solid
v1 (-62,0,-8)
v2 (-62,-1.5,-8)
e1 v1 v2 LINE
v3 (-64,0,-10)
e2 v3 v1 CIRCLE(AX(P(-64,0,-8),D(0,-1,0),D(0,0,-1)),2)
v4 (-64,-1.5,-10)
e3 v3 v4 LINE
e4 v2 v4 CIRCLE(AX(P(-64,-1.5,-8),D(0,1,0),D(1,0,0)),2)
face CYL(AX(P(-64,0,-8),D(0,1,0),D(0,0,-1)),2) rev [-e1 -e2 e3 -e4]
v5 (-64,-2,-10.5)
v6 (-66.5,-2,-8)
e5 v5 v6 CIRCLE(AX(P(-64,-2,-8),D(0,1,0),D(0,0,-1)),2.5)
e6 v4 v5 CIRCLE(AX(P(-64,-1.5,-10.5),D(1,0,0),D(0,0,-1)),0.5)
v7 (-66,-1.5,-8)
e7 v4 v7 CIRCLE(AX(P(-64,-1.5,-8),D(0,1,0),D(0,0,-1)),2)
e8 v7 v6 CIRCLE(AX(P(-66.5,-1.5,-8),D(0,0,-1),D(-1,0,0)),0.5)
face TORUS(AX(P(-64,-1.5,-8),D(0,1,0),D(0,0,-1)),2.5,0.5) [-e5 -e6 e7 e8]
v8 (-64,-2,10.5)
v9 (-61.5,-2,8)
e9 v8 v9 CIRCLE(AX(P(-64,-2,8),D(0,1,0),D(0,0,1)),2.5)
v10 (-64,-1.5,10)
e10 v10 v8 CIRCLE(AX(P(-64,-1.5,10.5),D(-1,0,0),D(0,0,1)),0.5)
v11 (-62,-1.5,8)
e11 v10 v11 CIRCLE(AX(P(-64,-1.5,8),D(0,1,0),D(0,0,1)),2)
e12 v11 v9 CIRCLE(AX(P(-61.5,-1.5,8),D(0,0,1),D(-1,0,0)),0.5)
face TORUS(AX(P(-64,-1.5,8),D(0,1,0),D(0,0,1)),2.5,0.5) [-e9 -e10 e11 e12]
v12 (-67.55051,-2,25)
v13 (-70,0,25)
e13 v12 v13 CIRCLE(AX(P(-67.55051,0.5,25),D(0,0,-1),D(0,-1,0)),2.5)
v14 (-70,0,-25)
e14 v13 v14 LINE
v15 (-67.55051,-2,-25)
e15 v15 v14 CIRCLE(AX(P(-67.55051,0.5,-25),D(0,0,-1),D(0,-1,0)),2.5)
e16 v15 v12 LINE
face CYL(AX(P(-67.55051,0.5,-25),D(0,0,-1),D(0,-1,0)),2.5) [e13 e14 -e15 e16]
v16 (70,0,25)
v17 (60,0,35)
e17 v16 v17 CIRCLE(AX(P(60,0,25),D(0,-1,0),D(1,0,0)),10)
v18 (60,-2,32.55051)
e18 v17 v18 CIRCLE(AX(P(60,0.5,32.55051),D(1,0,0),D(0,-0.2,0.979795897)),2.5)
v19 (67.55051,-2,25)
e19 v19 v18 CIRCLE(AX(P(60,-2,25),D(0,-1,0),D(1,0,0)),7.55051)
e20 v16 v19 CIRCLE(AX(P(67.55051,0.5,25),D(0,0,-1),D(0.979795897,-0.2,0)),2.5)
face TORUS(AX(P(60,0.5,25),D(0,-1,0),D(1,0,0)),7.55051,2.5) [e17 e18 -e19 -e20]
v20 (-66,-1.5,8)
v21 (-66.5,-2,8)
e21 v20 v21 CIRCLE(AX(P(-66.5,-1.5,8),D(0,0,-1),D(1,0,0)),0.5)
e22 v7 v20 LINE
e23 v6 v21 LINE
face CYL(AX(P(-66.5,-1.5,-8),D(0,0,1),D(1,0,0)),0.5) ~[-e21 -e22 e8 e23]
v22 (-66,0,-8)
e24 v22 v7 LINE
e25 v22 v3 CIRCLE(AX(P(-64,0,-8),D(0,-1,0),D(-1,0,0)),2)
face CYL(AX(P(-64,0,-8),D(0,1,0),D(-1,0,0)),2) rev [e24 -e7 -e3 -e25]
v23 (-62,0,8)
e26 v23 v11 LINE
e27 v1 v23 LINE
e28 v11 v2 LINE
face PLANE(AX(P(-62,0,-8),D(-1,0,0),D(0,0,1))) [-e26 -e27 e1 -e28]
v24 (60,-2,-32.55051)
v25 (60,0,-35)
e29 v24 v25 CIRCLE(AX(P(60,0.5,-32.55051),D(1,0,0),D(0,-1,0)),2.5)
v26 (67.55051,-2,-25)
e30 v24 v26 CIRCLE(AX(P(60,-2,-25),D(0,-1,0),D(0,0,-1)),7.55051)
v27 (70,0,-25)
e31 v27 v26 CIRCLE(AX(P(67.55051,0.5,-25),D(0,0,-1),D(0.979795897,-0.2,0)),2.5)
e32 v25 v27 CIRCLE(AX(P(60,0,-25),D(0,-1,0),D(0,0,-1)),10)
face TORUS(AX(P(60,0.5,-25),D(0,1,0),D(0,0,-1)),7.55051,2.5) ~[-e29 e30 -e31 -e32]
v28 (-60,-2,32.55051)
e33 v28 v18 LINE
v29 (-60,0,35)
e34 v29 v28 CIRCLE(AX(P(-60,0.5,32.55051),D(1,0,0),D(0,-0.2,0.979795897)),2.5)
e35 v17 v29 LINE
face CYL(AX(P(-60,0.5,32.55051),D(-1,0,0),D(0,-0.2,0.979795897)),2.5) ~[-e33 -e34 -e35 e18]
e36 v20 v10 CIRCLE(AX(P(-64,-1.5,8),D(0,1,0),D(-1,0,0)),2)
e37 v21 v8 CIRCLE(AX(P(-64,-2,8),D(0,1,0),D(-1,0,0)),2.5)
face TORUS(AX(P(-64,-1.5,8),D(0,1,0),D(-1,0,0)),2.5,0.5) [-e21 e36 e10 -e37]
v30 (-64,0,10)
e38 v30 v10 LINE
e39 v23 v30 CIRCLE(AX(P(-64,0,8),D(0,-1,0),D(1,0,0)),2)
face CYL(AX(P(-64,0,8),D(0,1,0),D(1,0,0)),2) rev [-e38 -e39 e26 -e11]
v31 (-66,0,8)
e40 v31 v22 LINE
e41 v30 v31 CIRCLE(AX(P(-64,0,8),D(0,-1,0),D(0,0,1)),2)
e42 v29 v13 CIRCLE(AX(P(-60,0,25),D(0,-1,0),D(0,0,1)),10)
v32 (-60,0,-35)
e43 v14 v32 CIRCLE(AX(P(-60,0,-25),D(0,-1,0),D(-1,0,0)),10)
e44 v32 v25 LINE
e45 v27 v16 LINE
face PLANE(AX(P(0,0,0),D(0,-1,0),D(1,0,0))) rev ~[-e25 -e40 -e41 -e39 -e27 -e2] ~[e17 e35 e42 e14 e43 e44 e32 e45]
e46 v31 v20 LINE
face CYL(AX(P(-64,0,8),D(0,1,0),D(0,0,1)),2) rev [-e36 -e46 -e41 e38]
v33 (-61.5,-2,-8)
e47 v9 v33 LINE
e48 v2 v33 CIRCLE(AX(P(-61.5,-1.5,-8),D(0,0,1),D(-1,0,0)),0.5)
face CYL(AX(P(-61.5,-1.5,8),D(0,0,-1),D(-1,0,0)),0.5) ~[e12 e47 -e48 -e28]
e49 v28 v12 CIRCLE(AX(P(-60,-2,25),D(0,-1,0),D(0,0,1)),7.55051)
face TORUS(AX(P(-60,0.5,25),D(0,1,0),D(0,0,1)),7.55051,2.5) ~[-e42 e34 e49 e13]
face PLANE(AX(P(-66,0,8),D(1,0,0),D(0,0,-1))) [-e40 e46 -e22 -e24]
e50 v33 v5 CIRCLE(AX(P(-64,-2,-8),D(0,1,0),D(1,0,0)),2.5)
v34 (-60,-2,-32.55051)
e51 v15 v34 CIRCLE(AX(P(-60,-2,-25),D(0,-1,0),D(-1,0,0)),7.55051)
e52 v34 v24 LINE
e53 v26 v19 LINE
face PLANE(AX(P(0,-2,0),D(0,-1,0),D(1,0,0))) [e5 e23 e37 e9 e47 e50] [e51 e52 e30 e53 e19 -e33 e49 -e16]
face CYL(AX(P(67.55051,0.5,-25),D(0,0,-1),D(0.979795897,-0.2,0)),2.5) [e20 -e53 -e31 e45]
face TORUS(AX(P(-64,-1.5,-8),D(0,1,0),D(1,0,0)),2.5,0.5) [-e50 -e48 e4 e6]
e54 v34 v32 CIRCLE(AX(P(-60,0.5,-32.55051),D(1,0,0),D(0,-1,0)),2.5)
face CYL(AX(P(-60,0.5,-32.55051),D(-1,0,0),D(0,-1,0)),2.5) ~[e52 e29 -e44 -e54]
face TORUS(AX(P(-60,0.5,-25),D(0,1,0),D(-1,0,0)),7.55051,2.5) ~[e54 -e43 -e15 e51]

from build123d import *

# Parameters (mm, degrees)
F1_DEPTH     = 2
F3_DEPTH     = 25
F4_T1_DEPTH  = 50
F4_T3_DEPTH  = 120
F4_T6_ANGLE  = 90
F4_T8_ANGLE  = 90
F4_T10_ANGLE = 90
F4_T12_ANGLE = 90
F5_R         = 0.5


# Not quite as in the source:
# - a fillet or chamfer that OpenCascade refuses, or shapes differently, is made with other operations: its cross-section is extruded or revolved along the edge and cut away or added


with BuildPart() as f1:
    # F0 (on Front) → F1 (new body)
    with BuildSketch(Plane.XZ):
        with BuildLine():
            ThreePointArc((70, 25), (67.0710678119, 32.0710678119), (60, 35))
            Line((60, 35), (-60, 35))
            ThreePointArc((-60, 35), (-67.0710678119, 32.0710678119), (-70, 25))
            Line((-70, 25), (-70, -25))
            ThreePointArc((-70, -25), (-67.0710678119, -32.0710678119), (-60, -35))
            Line((-60, -35), (60, -35))
            ThreePointArc((60, -35), (67.0710678119, -32.0710678119), (70, -25))
            Line((70, -25), (70, 25))
        make_face()
    extrude(amount=F1_DEPTH)

    # F2 (on Front) → F3 (cut)
    with BuildSketch(Plane.XZ):
        with BuildLine():
            Line((-62, -8), (-62, 8))
            ThreePointArc((-62, 8), (-62.5857864376, 9.4142135624), (-64, 10))
            ThreePointArc((-64, 10), (-65.4142135624, 9.4142135624), (-66, 8))
            Line((-66, 8), (-66, -8))
            ThreePointArc((-66, -8), (-65.4142135624, -9.4142135624), (-64, -10))
            ThreePointArc((-64, -10), (-62.5857864376, -9.4142135624), (-62, -8))
        make_face()
    extrude(amount=F3_DEPTH, mode=Mode.SUBTRACT)

    # F4: fillet of radius 2.5 on 1 edges, made by hand

    # F4_s2 → F4_t1 (cut)
    with BuildSketch(Plane.XY.offset(-25)):
        with BuildLine():
            ThreePointArc((-67.5505102572, -2), (-69.1316490873, -1.4364916731), (-70, 0))
            Line((-70, 0), (-70, -2))
            Line((-70, -2), (-67.5505102572, -2))
        make_face()
        with BuildLine():
            ThreePointArc((70, 0), (69.1316490873, -1.4364916731), (67.5505102572, -2))
            Line((67.5505102572, -2), (70, -2))
            Line((70, -2), (70, 0))
        make_face()
    extrude(amount=F4_T1_DEPTH, mode=Mode.SUBTRACT)

    # F4_s4 → F4_t3 (cut)
    with BuildSketch(Plane.YZ.offset(-60)):
        with BuildLine():
            ThreePointArc((-2, -32.5505102572), (-1.4364916731, -34.1316490873), (0, -35))
            Line((0, -35), (-2, -35))
            Line((-2, -35), (-2, -32.5505102572))
        make_face()
        with BuildLine():
            ThreePointArc((0, 35), (-1.4364916731, 34.1316490873), (-2, 32.5505102572))
            Line((-2, 32.5505102572), (-2, 35))
            Line((-2, 35), (0, 35))
        make_face()
    extrude(amount=F4_T3_DEPTH, mode=Mode.SUBTRACT)

    # F4_s5 → F4_t6 (revolve, cut)
    with BuildSketch(Plane.XY.offset(-25)):
        with BuildLine():
            ThreePointArc((-67.5505102572, -2), (-69.1316490873, -1.4364916731), (-70, 0))
            Line((-70, 0), (-70, -2))
            Line((-70, -2), (-67.5505102572, -2))
        make_face()
    revolve(axis=Axis((-60, -2, -25), (0, -1, 0)), revolution_arc=F4_T6_ANGLE, mode=Mode.SUBTRACT)

    # F4_s7 → F4_t8 (revolve, cut)
    with BuildSketch(Plane.YZ.offset(60)):
        with BuildLine():
            ThreePointArc((-2, -32.5505102572), (-1.4364916731, -34.1316490873), (0, -35))
            Line((0, -35), (-2, -35))
            Line((-2, -35), (-2, -32.5505102572))
        make_face()
    revolve(axis=Axis((60, -2, -25), (0, -1, 0)), revolution_arc=F4_T8_ANGLE, mode=Mode.SUBTRACT)

    # F4_s9 → F4_t10 (revolve, cut)
    with BuildSketch(Plane.XY.offset(25)):
        with BuildLine():
            ThreePointArc((70, 0), (69.1316490873, -1.4364916731), (67.5505102572, -2))
            Line((67.5505102572, -2), (70, -2))
            Line((70, -2), (70, 0))
        make_face()
    revolve(axis=Axis((60, -2, 25), (0, -1, 0)), revolution_arc=F4_T10_ANGLE, mode=Mode.SUBTRACT)

    # F4_s11 → F4_t12 (revolve, cut)
    with BuildSketch(Plane.YZ.offset(-60)):
        with BuildLine():
            ThreePointArc((-2, 32.5505102572), (-1.4364916731, 34.1316490873), (0, 35))
            Line((0, 35), (-2, 35))
            Line((-2, 35), (-2, 32.5505102572))
        make_face()
    revolve(axis=Axis((-60, -2, 25), (0, -1, 0)), revolution_arc=F4_T12_ANGLE, mode=Mode.SUBTRACT)

    # F5
    f5_edges = [f1.edges().sort_by_distance(p)[0] for p in [
        (-62, -2, 0),
        (-64, -2, 10),
        (-66, -2, 0),
        (-64, -2, -10),
    ]]
    fillet(f5_edges, radius=F5_R)


solid = f1.part
